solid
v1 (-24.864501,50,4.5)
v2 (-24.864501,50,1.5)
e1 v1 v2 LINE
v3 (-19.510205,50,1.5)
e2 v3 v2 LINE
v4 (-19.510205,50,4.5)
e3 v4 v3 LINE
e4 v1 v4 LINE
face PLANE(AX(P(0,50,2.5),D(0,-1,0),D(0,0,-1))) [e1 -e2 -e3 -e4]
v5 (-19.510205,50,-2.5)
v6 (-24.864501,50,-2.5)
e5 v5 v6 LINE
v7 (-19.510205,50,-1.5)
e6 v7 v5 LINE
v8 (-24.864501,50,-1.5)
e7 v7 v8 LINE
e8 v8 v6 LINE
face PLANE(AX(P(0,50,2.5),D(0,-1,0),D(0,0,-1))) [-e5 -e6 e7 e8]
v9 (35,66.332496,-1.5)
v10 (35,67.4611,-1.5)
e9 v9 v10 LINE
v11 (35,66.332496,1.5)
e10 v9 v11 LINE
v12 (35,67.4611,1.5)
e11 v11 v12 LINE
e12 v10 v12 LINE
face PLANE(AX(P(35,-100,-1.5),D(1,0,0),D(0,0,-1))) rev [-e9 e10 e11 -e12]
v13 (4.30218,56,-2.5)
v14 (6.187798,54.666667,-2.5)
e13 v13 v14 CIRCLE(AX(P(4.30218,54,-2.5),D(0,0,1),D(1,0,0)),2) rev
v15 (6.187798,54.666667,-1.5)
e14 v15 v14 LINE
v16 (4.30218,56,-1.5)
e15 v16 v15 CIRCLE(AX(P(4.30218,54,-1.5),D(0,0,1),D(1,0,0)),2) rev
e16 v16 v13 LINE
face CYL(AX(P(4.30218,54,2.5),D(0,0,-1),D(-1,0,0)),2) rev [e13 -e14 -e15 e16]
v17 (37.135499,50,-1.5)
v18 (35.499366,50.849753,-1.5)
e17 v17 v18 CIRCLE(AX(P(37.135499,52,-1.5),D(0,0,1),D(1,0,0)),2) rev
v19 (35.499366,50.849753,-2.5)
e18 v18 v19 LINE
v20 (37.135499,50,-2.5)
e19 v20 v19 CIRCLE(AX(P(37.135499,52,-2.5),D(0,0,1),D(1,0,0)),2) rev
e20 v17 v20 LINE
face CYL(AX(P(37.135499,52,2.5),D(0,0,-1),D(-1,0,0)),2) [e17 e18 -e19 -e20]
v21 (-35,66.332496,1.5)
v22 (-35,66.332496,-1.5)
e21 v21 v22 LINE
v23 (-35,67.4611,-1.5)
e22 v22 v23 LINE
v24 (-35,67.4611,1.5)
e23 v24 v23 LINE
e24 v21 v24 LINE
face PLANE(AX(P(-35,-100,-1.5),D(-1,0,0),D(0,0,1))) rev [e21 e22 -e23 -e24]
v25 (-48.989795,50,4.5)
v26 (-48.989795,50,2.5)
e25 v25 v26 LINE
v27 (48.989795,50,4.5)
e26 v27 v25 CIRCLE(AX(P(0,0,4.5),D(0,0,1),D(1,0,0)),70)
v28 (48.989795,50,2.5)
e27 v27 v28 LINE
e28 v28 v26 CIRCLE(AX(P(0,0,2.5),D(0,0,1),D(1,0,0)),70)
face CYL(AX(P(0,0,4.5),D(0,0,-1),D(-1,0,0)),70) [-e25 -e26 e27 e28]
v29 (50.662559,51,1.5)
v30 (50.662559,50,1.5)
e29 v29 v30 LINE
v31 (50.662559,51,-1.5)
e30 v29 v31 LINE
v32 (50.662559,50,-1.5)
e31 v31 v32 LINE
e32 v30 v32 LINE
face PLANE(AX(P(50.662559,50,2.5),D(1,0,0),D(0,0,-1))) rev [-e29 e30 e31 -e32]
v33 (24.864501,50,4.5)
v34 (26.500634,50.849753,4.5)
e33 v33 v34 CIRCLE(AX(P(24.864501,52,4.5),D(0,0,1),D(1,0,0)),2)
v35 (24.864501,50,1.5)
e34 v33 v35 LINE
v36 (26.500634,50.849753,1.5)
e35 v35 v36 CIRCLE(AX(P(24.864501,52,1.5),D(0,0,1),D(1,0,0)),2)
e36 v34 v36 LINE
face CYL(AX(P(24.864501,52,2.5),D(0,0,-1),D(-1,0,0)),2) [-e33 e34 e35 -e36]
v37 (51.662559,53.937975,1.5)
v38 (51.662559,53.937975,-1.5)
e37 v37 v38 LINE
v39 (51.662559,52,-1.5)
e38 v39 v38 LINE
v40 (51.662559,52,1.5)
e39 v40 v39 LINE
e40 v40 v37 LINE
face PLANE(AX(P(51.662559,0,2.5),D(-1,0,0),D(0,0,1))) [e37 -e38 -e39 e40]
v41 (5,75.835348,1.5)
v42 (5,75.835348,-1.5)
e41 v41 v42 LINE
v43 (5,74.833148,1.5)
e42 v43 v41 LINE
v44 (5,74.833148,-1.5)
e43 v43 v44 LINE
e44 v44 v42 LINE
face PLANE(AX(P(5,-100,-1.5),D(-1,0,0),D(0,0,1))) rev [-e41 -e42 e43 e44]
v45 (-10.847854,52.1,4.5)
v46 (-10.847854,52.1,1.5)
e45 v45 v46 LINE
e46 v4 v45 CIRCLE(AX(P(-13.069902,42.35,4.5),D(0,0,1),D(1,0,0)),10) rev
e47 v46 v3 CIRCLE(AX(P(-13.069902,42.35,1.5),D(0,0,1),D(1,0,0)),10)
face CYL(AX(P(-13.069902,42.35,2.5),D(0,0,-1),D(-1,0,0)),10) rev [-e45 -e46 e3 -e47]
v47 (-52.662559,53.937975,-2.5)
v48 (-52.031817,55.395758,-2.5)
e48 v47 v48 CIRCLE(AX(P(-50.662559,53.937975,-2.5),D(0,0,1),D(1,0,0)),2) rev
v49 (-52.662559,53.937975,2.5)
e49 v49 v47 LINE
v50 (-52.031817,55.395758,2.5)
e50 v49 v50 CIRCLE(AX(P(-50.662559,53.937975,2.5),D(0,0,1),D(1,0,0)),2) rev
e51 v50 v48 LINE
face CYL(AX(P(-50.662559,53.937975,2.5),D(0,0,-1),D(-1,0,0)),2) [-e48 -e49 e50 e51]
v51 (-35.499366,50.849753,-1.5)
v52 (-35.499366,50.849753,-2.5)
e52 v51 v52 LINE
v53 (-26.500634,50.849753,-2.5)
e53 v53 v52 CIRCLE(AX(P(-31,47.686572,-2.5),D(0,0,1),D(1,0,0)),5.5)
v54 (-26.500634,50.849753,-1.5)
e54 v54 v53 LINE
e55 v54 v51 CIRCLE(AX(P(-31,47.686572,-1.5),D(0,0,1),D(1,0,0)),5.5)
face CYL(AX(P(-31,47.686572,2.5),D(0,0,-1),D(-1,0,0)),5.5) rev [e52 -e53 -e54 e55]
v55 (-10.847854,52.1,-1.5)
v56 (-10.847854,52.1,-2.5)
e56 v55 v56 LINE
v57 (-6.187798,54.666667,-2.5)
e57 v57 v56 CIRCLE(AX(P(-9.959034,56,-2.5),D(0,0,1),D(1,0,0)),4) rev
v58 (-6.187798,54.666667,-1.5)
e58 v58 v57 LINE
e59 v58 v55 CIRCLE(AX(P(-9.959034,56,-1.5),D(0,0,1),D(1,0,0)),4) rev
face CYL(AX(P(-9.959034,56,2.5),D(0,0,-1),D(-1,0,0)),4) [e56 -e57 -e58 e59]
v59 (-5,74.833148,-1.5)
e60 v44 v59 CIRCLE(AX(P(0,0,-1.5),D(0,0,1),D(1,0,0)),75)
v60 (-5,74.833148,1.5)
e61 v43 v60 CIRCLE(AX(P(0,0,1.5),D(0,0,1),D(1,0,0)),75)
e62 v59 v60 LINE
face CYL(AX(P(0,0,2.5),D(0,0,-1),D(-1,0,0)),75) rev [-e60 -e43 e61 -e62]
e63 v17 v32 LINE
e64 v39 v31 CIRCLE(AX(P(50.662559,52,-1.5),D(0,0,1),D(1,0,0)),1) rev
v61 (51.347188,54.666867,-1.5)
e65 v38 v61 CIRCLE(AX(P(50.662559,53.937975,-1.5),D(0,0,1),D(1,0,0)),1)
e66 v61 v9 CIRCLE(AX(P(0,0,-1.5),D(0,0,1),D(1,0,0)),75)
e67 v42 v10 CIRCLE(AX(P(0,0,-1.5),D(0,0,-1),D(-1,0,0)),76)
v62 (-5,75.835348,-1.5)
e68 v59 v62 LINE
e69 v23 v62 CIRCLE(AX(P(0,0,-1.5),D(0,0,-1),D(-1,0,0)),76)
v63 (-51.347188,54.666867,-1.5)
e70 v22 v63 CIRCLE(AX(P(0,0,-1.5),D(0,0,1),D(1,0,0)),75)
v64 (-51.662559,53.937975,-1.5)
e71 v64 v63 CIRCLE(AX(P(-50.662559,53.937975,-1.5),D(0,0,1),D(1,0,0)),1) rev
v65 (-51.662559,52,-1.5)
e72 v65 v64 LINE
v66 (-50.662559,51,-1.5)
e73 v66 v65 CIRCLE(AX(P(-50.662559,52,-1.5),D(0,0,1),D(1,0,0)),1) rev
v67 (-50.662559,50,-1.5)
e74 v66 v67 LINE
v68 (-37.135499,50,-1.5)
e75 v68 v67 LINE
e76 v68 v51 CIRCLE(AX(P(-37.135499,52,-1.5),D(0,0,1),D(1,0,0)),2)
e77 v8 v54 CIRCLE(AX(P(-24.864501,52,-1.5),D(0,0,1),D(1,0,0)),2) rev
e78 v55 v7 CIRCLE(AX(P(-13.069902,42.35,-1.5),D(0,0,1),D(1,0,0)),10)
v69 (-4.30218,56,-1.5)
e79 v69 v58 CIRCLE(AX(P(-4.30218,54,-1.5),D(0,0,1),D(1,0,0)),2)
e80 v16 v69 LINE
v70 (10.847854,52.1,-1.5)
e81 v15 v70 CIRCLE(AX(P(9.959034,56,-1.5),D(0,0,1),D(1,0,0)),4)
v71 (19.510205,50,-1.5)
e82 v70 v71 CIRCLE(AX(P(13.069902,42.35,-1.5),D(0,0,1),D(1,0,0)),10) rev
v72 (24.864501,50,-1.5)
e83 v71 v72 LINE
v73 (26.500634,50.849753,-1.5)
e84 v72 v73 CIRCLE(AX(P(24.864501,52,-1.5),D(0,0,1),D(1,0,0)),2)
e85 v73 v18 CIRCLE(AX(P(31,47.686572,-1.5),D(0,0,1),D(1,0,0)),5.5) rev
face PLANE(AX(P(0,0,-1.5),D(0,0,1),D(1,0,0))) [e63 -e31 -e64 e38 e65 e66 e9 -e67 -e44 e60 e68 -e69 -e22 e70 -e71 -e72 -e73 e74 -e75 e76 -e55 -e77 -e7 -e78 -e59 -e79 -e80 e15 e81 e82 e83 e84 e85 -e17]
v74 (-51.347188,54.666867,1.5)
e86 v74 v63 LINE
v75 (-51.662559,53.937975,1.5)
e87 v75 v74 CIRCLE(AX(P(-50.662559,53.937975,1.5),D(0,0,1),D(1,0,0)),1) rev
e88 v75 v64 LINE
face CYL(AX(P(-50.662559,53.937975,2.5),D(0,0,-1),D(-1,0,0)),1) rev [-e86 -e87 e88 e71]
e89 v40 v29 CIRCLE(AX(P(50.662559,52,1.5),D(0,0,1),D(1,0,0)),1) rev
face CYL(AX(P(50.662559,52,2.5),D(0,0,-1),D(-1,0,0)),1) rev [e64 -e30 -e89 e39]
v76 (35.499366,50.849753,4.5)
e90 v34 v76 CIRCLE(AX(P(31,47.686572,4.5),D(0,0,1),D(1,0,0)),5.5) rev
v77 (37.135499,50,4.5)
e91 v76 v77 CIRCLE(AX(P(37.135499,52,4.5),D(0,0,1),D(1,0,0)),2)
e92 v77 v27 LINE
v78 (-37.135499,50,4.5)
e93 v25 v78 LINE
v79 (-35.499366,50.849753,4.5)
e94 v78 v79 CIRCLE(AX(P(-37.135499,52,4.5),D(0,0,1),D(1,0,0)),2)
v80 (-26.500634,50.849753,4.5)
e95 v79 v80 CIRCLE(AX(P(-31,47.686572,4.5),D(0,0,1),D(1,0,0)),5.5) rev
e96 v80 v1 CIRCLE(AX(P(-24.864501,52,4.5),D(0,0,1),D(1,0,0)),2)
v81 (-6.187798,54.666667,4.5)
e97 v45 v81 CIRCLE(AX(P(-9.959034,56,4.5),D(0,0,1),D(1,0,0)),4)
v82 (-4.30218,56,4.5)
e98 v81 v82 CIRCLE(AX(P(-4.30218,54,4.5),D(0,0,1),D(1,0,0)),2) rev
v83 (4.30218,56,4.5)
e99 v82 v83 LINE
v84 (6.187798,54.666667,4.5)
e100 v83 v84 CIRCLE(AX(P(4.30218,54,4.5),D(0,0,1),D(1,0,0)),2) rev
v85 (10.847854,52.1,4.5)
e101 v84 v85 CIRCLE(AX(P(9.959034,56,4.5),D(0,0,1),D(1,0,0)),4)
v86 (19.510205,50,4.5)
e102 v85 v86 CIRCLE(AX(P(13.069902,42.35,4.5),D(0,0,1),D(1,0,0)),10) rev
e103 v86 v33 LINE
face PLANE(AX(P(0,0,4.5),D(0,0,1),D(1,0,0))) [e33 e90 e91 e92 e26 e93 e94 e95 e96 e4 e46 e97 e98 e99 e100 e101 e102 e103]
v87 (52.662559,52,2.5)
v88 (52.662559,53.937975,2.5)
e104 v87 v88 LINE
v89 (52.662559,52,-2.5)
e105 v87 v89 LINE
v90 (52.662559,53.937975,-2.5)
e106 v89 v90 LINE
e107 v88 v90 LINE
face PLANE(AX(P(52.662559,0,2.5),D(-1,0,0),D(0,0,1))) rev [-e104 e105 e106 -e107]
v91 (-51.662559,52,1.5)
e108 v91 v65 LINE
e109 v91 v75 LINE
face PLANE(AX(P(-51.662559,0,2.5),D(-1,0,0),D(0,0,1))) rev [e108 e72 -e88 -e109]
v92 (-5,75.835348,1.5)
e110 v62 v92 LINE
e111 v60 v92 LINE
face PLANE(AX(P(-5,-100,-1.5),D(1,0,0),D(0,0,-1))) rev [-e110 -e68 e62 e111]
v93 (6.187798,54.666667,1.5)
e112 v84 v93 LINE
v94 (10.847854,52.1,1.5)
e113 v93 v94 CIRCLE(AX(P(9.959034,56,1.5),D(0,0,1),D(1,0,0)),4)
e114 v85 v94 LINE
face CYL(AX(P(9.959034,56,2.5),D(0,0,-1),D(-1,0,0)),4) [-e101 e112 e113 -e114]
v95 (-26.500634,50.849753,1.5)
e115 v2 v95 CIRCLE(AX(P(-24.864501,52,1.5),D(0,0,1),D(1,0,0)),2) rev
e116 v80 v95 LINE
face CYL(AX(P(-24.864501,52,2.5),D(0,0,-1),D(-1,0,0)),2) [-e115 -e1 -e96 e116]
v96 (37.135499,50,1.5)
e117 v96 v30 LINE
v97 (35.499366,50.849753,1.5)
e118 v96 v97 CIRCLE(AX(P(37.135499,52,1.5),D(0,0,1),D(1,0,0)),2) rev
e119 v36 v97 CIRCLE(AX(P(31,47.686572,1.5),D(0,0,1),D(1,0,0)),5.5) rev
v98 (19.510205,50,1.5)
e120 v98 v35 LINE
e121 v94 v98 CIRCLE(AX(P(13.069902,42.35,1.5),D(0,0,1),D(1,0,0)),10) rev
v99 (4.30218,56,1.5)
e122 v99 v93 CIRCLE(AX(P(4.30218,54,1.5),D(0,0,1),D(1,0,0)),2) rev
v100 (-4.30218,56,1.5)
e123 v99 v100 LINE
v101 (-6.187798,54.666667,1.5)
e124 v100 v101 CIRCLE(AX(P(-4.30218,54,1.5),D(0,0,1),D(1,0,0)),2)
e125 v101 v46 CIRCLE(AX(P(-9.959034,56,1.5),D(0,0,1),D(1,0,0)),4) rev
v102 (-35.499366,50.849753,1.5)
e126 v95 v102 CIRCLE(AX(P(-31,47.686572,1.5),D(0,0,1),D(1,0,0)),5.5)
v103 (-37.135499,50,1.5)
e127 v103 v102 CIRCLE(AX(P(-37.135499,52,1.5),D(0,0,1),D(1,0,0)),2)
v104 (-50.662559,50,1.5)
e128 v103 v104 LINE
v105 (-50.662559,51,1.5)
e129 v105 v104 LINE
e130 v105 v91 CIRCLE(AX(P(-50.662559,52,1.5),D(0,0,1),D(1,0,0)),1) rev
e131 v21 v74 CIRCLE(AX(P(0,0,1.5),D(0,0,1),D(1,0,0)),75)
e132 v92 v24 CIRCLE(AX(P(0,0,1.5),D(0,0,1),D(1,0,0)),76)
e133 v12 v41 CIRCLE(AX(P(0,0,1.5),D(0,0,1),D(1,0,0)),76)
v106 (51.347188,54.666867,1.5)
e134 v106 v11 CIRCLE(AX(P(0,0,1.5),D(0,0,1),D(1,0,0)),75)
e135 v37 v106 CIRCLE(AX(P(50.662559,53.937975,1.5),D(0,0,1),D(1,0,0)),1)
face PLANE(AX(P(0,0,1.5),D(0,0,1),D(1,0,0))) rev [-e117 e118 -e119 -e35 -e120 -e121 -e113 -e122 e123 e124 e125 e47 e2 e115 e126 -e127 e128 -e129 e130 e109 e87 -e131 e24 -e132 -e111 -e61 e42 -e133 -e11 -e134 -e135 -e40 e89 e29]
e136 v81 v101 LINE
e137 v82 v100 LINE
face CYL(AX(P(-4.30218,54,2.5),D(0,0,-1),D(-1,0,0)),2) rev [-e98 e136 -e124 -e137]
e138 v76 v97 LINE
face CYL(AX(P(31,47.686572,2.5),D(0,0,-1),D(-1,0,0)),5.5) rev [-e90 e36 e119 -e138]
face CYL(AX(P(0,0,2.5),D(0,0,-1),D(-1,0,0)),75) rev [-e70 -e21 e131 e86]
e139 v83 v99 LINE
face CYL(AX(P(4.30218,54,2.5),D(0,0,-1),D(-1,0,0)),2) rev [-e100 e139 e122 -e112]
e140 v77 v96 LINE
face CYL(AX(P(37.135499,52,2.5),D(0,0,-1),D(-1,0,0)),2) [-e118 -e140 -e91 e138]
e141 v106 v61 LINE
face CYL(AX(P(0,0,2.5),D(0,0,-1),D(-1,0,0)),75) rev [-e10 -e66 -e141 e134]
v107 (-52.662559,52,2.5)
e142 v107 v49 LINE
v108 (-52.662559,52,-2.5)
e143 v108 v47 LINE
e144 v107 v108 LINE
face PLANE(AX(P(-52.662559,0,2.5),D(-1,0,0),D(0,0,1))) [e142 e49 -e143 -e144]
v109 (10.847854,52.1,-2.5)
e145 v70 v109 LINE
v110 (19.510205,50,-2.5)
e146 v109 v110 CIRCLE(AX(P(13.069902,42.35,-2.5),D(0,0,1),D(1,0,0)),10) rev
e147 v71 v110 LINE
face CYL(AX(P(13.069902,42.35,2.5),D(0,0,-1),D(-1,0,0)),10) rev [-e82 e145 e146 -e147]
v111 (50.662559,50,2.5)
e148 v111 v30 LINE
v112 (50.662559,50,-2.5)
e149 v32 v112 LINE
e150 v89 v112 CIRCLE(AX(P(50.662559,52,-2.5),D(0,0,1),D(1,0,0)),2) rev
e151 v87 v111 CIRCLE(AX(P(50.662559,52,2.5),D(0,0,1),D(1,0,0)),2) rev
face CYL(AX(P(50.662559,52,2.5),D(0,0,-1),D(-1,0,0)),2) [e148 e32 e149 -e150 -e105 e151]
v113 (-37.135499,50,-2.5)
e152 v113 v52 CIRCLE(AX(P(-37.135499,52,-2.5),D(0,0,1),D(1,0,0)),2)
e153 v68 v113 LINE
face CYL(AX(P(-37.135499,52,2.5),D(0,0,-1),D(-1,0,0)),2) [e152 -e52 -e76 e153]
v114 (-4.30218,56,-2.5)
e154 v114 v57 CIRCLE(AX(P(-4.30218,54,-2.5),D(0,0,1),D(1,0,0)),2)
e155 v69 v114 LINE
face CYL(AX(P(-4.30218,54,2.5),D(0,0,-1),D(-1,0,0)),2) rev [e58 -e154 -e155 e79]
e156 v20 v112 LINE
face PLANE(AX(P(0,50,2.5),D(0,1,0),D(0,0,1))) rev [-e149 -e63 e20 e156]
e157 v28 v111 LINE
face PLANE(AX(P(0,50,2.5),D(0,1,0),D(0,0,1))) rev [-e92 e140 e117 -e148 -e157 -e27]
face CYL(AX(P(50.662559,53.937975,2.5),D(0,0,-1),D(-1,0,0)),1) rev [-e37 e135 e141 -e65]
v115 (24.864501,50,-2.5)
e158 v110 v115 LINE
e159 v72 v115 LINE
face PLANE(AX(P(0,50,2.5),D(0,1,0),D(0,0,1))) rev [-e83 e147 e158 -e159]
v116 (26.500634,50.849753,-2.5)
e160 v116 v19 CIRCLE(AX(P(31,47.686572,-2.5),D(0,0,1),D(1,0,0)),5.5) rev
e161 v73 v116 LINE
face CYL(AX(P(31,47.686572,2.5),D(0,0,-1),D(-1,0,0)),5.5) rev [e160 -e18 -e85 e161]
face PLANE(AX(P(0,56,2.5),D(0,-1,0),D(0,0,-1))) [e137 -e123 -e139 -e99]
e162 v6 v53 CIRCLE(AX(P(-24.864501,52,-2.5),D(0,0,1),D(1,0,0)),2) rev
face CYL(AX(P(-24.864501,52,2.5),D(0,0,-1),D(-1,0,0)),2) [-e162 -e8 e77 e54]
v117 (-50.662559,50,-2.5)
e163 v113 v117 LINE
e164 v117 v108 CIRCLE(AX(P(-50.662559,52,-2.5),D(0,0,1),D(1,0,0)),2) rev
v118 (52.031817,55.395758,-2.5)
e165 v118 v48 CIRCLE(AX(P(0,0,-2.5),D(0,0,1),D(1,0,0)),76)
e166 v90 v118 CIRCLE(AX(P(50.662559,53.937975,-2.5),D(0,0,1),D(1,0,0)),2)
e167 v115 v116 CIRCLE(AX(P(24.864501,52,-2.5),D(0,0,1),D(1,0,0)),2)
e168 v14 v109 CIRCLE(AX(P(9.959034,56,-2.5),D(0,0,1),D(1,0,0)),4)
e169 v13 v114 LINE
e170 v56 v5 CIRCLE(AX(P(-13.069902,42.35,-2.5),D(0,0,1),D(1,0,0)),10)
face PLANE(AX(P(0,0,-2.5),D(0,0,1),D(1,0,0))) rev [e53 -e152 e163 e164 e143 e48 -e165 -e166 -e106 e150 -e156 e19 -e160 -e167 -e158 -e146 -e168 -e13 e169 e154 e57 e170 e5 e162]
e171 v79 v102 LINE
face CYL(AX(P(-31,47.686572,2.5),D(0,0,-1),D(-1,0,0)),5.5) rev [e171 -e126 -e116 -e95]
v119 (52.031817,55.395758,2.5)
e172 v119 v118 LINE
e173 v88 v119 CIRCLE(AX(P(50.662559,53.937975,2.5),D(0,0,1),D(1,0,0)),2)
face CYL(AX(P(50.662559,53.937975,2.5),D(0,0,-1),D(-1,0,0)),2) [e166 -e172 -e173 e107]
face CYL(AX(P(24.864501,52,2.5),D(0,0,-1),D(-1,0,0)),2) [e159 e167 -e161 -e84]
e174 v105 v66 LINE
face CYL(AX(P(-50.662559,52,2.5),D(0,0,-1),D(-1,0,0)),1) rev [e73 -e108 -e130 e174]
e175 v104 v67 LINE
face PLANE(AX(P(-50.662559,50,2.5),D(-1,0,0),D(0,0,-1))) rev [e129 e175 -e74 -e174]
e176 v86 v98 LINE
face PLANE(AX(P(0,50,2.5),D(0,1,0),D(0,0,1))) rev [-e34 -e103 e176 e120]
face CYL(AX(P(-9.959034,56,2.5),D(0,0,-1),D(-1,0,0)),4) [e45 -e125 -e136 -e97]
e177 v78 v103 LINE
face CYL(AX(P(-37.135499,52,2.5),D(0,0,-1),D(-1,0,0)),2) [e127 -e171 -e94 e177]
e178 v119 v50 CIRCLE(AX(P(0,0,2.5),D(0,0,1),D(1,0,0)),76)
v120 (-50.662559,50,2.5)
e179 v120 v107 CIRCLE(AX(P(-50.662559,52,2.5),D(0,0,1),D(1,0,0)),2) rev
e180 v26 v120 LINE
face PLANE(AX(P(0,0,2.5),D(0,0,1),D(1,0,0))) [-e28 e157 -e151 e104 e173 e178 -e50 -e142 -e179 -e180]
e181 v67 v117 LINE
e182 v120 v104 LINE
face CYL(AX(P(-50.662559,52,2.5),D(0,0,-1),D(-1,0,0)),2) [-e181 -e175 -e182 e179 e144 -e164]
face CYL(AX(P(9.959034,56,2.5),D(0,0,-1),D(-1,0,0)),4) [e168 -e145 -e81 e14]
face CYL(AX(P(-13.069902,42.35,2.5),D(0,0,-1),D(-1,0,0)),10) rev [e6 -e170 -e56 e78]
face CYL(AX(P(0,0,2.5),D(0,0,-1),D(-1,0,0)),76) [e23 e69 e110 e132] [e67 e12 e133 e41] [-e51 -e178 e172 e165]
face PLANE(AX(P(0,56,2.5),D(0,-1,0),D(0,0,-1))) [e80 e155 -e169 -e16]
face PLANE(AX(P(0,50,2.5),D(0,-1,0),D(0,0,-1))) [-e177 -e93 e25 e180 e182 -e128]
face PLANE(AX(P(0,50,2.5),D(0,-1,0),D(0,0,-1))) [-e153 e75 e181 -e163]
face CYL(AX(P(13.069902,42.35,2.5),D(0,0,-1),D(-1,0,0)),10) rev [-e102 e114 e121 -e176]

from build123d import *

# Parameters (mm, degrees)
BOSS_EXTRUDE1_DEPTH = 2.5
SHELL1_START        = -1.5
SHELL1_DEPTH        = 3
BOSS_EXTRUDE2_START = 2
BOSS_EXTRUDE2_DEPTH = 2
SKETCH4_W           = 30
SKETCH4_H           = 3
CUT_EXTRUDE1_DEPTH  = 100


# Read off the part's stored shape, not the designer's step: Shell1
with BuildPart() as part:
    # Sketch1 → Boss-Extrude1 (new, symmetric)
    with BuildSketch(Plane.XY):
        with BuildLine():
            ThreePointArc((-50.662558564, 50), (-52.076772126, 50.585786438), (-52.662558564, 52))
            Line((-52.662558564, 52), (-52.662558564, 53.937975118))
            ThreePointArc((-52.662558564, 53.937975118), (-52.498112524, 54.732167576), (-52.031816903, 55.395758229))
            ThreePointArc((-52.031816903, 55.395758229), (0, 76), (52.031816903, 55.395758229))
            ThreePointArc((52.031816903, 55.395758229), (52.498112524, 54.732167576), (52.662558564, 53.937975118))
            Line((52.662558564, 53.937975118), (52.662558564, 52))
            ThreePointArc((52.662558564, 52), (52.076772126, 50.585786438), (50.662558564, 50))
            Line((50.662558564, 50), (48.989794856, 50))
            ThreePointArc((48.989794856, 50), (0, 70), (-48.989794856, 50))
            Line((-48.989794856, 50), (-50.662558564, 50))
        make_face()
        with BuildLine():
            ThreePointArc((4.302180061, 56), (5.456880599, 55.632993162), (6.187798144, 54.666666667))
            ThreePointArc((6.187798144, 54.666666667), (8.029260752, 52.496291392), (10.847853752, 52.1))
            ThreePointArc((10.847853752, 52.1), (15.425940788, 52.068491802), (19.510205144, 50))
            Line((19.510205144, 50), (24.864501465, 50))
            ThreePointArc((24.864501465, 50), (25.78632175, 50.22510638), (26.500634408, 50.849752638))
            ThreePointArc((26.500634408, 50.849752638), (31, 53.186572392), (35.499365592, 50.849752638))
            ThreePointArc((35.499365592, 50.849752638), (36.21367825, 50.22510638), (37.135498535, 50))
            Line((37.135498535, 50), (48.989794856, 50))
            ThreePointArc((48.989794856, 50), (0, 70), (-48.989794856, 50))
            Line((-48.989794856, 50), (-37.135498535, 50))
            ThreePointArc((-37.135498535, 50), (-36.21367825, 50.22510638), (-35.499365592, 50.849752638))
            ThreePointArc((-35.499365592, 50.849752638), (-31, 53.186572392), (-26.500634408, 50.849752638))
            ThreePointArc((-26.500634408, 50.849752638), (-25.78632175, 50.22510638), (-24.864501465, 50))
            Line((-24.864501465, 50), (-19.510205144, 50))
            ThreePointArc((-19.510205144, 50), (-15.425940788, 52.068491802), (-10.847853752, 52.1))
            ThreePointArc((-10.847853752, 52.1), (-8.029260752, 52.496291392), (-6.187798144, 54.666666667))
            ThreePointArc((-6.187798144, 54.666666667), (-5.456880599, 55.632993162), (-4.302180061, 56))
            Line((-4.302180061, 56), (4.302180061, 56))
        make_face()
    extrude(amount=BOSS_EXTRUDE1_DEPTH, both=True)

    # Shell1 outline → Shell1 (cut)
    with BuildSketch(Plane.XY.offset(SHELL1_START)):
        with BuildLine():
            Line((37.135498535, 50), (50.662558564, 50))
            Line((50.662558564, 50), (50.662558564, 51))
            ThreePointArc((50.662558564, 51), (51.369665345, 51.292893219), (51.662558564, 52))
            Line((51.662558564, 52), (51.662558564, 53.937975118))
            ThreePointArc((51.662558564, 53.937975118), (51.580335544, 54.335071347), (51.347187733, 54.666866673))
            ThreePointArc((51.347187733, 54.666866673), (0, 75), (-51.347187733, 54.666866673))
            ThreePointArc((-51.347187733, 54.666866673), (-51.580335544, 54.335071347), (-51.662558564, 53.937975118))
            Line((-51.662558564, 53.937975118), (-51.662558564, 52))
            ThreePointArc((-51.662558564, 52), (-51.369665345, 51.292893219), (-50.662558564, 51))
            Line((-50.662558564, 51), (-50.662558564, 50))
            Line((-50.662558564, 50), (-37.135498535, 50))
            ThreePointArc((-37.135498535, 50), (-36.21367825, 50.22510638), (-35.499365592, 50.849752638))
            ThreePointArc((-35.499365592, 50.849752638), (-31, 53.186572392), (-26.500634408, 50.849752638))
            ThreePointArc((-26.500634408, 50.849752638), (-25.78632175, 50.22510638), (-24.864501465, 50))
            Line((-24.864501465, 50), (-19.510205144, 50))
            ThreePointArc((-19.510205144, 50), (-15.425940787, 52.068491802), (-10.847853752, 52.1))
            ThreePointArc((-10.847853752, 52.1), (-8.029260752, 52.496291392), (-6.187798144, 54.666666667))
            ThreePointArc((-6.187798144, 54.666666667), (-5.456880599, 55.632993162), (-4.302180061, 56))
            Line((-4.302180061, 56), (4.302180061, 56))
            ThreePointArc((4.302180061, 56), (5.456880599, 55.632993162), (6.187798144, 54.666666667))
            ThreePointArc((6.187798144, 54.666666667), (8.029260752, 52.496291392), (10.847853752, 52.1))
            ThreePointArc((10.847853752, 52.1), (15.425940787, 52.068491802), (19.510205144, 50))
            Line((19.510205144, 50), (24.864501465, 50))
            ThreePointArc((24.864501465, 50), (25.78632175, 50.22510638), (26.500634408, 50.849752638))
            ThreePointArc((26.500634408, 50.849752638), (31, 53.186572392), (35.499365592, 50.849752638))
            ThreePointArc((35.499365592, 50.849752638), (36.21367825, 50.22510638), (37.135498535, 50))
        make_face()
    extrude(amount=SHELL1_DEPTH, mode=Mode.SUBTRACT)

    # Sketch3 → Boss-Extrude2 (add)
    with BuildSketch(Plane.XY.offset(2.5).offset(BOSS_EXTRUDE2_START)):
        with BuildLine():
            ThreePointArc((48.989794856, 50), (0, 70), (-48.989794856, 50))
            Line((-48.989794856, 50), (-37.135498535, 50))
            ThreePointArc((-37.135498535, 50), (-36.21367825, 50.22510638), (-35.499365592, 50.849752638))
            ThreePointArc((-35.499365592, 50.849752638), (-31, 53.186572392), (-26.500634408, 50.849752638))
            ThreePointArc((-26.500634408, 50.849752638), (-25.78632175, 50.22510638), (-24.864501465, 50))
            Line((-24.864501465, 50), (-19.510205144, 50))
            ThreePointArc((-19.510205144, 50), (-15.425940788, 52.068491802), (-10.847853752, 52.1))
            ThreePointArc((-10.847853752, 52.1), (-8.029260752, 52.496291392), (-6.187798144, 54.666666667))
            ThreePointArc((-6.187798144, 54.666666667), (-5.456880599, 55.632993162), (-4.302180061, 56))
            Line((-4.302180061, 56), (4.302180061, 56))
            ThreePointArc((4.302180061, 56), (5.456880599, 55.632993162), (6.187798144, 54.666666667))
            ThreePointArc((6.187798144, 54.666666667), (8.029260752, 52.496291392), (10.847853752, 52.1))
            ThreePointArc((10.847853752, 52.1), (15.425940788, 52.068491802), (19.510205144, 50))
            Line((19.510205144, 50), (24.864501465, 50))
            ThreePointArc((24.864501465, 50), (25.78632175, 50.22510638), (26.500634408, 50.849752638))
            ThreePointArc((26.500634408, 50.849752638), (31, 53.186572392), (35.499365592, 50.849752638))
            ThreePointArc((35.499365592, 50.849752638), (36.21367825, 50.22510638), (37.135498535, 50))
            Line((37.135498535, 50), (48.989794856, 50))
        make_face()
    extrude(amount=-BOSS_EXTRUDE2_DEPTH)

    # Sketch4 → Cut-Extrude1 (cut, symmetric)
    with BuildSketch(Plane(origin=(0, 0, 0), x_dir=(1, 0, 0), z_dir=(0, 1, 0))):
        with Locations((-20, 0)):
            Rectangle(SKETCH4_W, SKETCH4_H)
        with Locations((20, 0)):
            Rectangle(SKETCH4_W, SKETCH4_H)
    extrude(amount=CUT_EXTRUDE1_DEPTH, both=True, mode=Mode.SUBTRACT)


solid = part.part
